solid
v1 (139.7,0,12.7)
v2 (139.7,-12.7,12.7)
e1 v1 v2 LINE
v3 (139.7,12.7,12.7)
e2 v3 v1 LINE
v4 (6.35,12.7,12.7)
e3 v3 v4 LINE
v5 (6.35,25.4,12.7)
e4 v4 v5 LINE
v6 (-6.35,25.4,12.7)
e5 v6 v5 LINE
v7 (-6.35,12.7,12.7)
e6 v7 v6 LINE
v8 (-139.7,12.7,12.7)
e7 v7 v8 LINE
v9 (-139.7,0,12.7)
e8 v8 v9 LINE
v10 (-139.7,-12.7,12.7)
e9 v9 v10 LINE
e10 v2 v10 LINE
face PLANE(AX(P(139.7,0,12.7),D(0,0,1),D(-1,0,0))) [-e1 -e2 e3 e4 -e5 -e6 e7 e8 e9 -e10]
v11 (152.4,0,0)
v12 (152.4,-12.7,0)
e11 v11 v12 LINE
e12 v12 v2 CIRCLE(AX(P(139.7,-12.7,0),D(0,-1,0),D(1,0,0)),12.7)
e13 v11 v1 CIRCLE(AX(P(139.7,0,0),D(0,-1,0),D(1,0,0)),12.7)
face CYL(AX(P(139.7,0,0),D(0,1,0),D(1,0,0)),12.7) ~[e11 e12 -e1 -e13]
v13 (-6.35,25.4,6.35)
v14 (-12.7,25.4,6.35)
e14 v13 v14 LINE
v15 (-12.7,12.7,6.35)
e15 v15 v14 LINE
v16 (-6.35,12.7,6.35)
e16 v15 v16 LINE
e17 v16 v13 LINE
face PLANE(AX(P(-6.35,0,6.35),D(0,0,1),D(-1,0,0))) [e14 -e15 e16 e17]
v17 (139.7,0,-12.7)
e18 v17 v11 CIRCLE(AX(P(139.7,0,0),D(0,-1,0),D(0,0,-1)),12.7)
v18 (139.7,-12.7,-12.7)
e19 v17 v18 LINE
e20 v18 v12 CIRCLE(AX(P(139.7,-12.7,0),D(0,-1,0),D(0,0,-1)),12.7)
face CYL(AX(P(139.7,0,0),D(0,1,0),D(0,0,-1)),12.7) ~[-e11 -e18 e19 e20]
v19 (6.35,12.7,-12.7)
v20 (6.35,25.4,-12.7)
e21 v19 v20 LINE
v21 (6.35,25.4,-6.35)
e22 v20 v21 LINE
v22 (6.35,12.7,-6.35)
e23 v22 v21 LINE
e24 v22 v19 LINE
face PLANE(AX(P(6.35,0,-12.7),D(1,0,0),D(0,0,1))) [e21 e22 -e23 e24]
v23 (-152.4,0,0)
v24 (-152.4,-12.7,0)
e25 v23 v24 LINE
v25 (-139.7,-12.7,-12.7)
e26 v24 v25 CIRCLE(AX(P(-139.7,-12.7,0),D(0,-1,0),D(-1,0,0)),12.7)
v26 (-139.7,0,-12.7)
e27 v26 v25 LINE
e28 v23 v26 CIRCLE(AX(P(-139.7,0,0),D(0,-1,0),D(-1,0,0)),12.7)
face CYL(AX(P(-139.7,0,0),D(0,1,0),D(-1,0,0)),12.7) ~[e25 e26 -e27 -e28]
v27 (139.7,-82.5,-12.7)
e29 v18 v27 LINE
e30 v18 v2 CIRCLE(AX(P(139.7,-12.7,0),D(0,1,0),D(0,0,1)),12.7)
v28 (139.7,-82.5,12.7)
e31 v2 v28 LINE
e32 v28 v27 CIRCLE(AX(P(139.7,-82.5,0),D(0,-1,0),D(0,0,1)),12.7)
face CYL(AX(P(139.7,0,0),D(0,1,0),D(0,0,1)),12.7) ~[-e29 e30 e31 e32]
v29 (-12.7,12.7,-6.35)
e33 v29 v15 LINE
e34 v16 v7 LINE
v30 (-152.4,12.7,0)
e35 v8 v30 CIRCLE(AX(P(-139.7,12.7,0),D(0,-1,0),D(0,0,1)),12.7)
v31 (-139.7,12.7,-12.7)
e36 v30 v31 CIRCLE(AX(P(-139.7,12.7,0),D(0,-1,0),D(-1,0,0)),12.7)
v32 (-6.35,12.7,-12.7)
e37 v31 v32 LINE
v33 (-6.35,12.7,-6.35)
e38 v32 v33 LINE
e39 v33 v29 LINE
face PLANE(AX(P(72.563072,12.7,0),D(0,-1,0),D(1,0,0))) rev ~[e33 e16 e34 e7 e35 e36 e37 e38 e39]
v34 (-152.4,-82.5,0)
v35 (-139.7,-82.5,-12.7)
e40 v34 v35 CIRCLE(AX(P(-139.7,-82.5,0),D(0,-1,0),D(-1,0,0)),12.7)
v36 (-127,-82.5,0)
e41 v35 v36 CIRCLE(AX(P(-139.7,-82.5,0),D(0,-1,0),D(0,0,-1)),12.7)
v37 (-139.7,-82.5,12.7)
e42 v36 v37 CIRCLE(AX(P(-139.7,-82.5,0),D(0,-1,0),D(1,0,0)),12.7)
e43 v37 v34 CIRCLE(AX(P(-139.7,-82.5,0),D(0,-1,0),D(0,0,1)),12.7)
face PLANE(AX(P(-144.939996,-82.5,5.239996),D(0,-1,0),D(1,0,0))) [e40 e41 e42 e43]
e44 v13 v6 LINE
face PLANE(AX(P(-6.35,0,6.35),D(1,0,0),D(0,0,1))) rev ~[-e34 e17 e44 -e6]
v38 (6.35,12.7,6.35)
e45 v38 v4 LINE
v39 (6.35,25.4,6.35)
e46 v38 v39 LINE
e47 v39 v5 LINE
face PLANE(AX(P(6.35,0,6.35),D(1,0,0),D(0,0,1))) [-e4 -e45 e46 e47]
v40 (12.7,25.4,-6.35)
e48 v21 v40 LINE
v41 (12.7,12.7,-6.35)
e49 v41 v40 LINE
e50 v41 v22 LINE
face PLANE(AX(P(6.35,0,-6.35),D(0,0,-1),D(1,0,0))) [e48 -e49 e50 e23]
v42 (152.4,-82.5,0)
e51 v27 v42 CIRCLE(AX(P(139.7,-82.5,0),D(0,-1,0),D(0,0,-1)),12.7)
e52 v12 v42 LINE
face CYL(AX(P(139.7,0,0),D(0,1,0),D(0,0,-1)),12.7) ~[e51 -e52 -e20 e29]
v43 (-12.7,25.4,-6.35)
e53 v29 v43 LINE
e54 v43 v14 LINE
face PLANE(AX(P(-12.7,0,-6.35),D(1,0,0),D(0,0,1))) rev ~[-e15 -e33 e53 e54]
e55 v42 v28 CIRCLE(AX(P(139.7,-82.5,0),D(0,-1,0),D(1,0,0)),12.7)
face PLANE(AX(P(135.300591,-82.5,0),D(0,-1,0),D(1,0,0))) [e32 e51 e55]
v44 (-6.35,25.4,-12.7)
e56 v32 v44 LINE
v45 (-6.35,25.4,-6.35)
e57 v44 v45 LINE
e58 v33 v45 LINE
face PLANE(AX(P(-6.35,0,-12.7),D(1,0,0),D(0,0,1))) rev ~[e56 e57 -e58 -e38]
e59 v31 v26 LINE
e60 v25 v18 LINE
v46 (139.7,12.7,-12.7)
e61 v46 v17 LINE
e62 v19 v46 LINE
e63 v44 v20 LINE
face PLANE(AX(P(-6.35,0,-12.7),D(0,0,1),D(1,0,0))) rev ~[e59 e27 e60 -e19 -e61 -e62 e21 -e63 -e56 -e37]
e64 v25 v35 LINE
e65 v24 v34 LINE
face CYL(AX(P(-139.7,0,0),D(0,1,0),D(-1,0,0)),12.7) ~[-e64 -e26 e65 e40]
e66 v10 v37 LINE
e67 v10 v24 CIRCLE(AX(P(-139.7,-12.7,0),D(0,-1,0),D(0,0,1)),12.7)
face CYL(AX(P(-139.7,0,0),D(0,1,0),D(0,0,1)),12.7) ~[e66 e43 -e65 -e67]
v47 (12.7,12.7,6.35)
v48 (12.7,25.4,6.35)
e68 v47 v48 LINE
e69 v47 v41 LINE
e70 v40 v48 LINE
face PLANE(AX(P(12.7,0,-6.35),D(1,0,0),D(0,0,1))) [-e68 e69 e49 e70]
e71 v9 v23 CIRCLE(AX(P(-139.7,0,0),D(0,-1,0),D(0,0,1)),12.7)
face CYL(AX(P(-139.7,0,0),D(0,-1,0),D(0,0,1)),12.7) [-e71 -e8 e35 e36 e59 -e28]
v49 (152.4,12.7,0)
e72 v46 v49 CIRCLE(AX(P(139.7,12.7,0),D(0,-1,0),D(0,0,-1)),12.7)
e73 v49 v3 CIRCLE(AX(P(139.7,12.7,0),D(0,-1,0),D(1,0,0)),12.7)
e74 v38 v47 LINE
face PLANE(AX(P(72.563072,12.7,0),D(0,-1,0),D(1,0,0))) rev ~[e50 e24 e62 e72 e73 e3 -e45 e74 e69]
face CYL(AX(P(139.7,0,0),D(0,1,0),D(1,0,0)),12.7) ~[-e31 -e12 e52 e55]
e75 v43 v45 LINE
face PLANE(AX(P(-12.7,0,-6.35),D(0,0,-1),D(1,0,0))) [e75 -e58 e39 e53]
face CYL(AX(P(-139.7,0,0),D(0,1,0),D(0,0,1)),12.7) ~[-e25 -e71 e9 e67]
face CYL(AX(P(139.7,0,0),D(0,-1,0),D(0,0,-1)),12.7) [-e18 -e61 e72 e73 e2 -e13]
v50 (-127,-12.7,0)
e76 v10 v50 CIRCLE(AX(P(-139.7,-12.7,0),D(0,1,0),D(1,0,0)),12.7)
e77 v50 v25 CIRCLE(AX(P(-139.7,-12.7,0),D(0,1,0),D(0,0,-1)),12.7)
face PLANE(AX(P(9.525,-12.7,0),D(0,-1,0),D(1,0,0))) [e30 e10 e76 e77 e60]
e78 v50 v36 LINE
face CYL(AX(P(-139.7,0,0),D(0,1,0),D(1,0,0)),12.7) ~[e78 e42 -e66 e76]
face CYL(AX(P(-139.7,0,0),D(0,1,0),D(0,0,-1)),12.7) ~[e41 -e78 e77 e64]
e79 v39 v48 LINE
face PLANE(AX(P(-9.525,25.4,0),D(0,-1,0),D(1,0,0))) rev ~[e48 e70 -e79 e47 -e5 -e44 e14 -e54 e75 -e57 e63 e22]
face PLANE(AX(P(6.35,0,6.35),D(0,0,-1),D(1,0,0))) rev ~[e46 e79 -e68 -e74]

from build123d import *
from build123d import SkipClean  # not in build123d's __all__

# Parameters (mm, degrees)
F1_DEPTH = 82.5
F0_W     = 12.7
F0_H     = 6.35
F2_DEPTH = 12.7
F0_W_2   = 6.35
F0_H_2   = 12.7
F4_DEPTH = 25.4
F5_DEPTH = 12.7


# Not quite as in the source:
# - after a boolean that leaves OpenCascade's solid faulty, fix() repairs it
# - a feature of the source that left no trace in its solid (it failed there, or was rolled back) is left out
# - a feature names something its author has since deleted; it is built from what else it names


with BuildPart() as f1:
    # F0 (on Front) → F1 (new body)
    with BuildSketch(Plane.XZ):
        with BuildLine():
            Line((-139.7, 0), (-139.7, 12.7))
            ThreePointArc((-139.7, 12.7), (-148.6802561211, 8.9802561211), (-152.4, 0))
            Line((-152.4, 0), (-139.7, 0))
        make_face()
        with BuildLine():
            ThreePointArc((-127, 0), (-130.7197438789, 8.9802561211), (-139.7, 12.7))
            Line((-139.7, 12.7), (-139.7, 0))
            Line((-139.7, 0), (-139.7, -12.7))
            ThreePointArc((-139.7, -12.7), (-130.7197438789, -8.9802561211), (-127, 0))
        make_face()
        with BuildLine():
            Line((-139.7, -12.7), (-139.7, 0))
            Line((-139.7, 0), (-152.4, 0))
            ThreePointArc((-152.4, 0), (-148.6802561211, -8.9802561211), (-139.7, -12.7))
        make_face()
        with BuildLine():
            ThreePointArc((-127, 0), (-130.7197438789, 8.9802561211), (-139.7, 12.7))
            Line((-139.7, 12.7), (-139.7, 0))
            Line((-139.7, 0), (-139.7, -12.7))
            ThreePointArc((-139.7, -12.7), (-130.7197438789, -8.9802561211), (-127, 0))
        make_face()
    extrude(amount=F1_DEPTH)



with BuildPart() as f1b:
    # F0 (on Front) → F1, piece 2 (new body)
    with BuildSketch(Plane.XZ):
        with BuildLine():
            Line((139.7, -12.7), (139.7, 12.7))
            ThreePointArc((139.7, 12.7), (127, 0), (139.7, -12.7))
        make_face()
        with BuildLine():
            ThreePointArc((152.4, 0), (148.6802561211, 8.9802561211), (139.7, 12.7))
            Line((139.7, 12.7), (139.7, -12.7))
            ThreePointArc((139.7, -12.7), (148.6802561211, -8.9802561211), (152.4, 0))
        make_face()
        with BuildLine():
            ThreePointArc((152.4, 0), (148.6802561211, 8.9802561211), (139.7, 12.7))
            Line((139.7, 12.7), (139.7, -12.7))
            ThreePointArc((139.7, -12.7), (148.6802561211, -8.9802561211), (152.4, 0))
        make_face()
    extrude(amount=F1_DEPTH)


with BuildPart() as f1_1:
    add(f1.part, clean=False)

    with SkipClean():  # cleaning this boolean's faces spoils the solid; the shape is the same uncleaned
        add(f1b.part)  # F2 merges F1b
    # F0 (on Front) → F2 (join, symmetric)
    with BuildSketch(Plane.XZ):
        with BuildLine():
            Line((139.7, 12.7), (6.35, 12.7))
            Line((6.35, 12.7), (6.35, 6.35))
            Line((6.35, 6.35), (12.7, 6.35))
            Line((12.7, 6.35), (12.7, -6.35))
            Line((12.7, -6.35), (6.35, -6.35))
            Line((6.35, -6.35), (6.35, -12.7))
            Line((6.35, -12.7), (139.7, -12.7))
            ThreePointArc((139.7, -12.7), (127, 0), (139.7, 12.7))
        make_face()
        with BuildLine():
            Line((139.7, -12.7), (139.7, 12.7))
            ThreePointArc((139.7, 12.7), (127, 0), (139.7, -12.7))
        make_face()
        with BuildLine():
            Line((139.7, -12.7), (139.7, 12.7))
            ThreePointArc((139.7, 12.7), (127, 0), (139.7, -12.7))
        make_face()
        with BuildLine():
            ThreePointArc((152.4, 0), (148.6802561211, 8.9802561211), (139.7, 12.7))
            Line((139.7, 12.7), (139.7, -12.7))
            ThreePointArc((139.7, -12.7), (148.6802561211, -8.9802561211), (152.4, 0))
        make_face()
        with BuildLine():
            Line((-139.7, 0), (-139.7, 12.7))
            ThreePointArc((-139.7, 12.7), (-148.6802561211, 8.9802561211), (-152.4, 0))
            Line((-152.4, 0), (-139.7, 0))
        make_face()
        with BuildLine():
            Line((-139.7, -12.7), (-139.7, 0))
            Line((-139.7, 0), (-152.4, 0))
            ThreePointArc((-152.4, 0), (-148.6802561211, -8.9802561211), (-139.7, -12.7))
        make_face()
        with BuildLine():
            ThreePointArc((-127, 0), (-130.7197438789, 8.9802561211), (-139.7, 12.7))
            Line((-139.7, 12.7), (-139.7, 0))
            Line((-139.7, 0), (-139.7, -12.7))
            ThreePointArc((-139.7, -12.7), (-130.7197438789, -8.9802561211), (-127, 0))
        make_face()
        with BuildLine():
            Line((-6.35, 12.7), (-139.7, 12.7))
            ThreePointArc((-139.7, 12.7), (-130.7197438789, 8.9802561211), (-127, 0))
            ThreePointArc((-127, 0), (-130.7197438789, -8.9802561211), (-139.7, -12.7))
            Line((-139.7, -12.7), (-6.35, -12.7))
            Line((-6.35, -12.7), (-6.35, -6.35))
            Line((-6.35, -6.35), (-12.7, -6.35))
            Line((-12.7, -6.35), (-12.7, 6.35))
            Line((-12.7, 6.35), (-6.35, 6.35))
            Line((-6.35, 6.35), (-6.35, 12.7))
        make_face()
        with Locations((0, 9.525)):
            Rectangle(F0_W, F0_H)
    with SkipClean():  # cleaning this boolean's faces spoils the solid; the shape is the same uncleaned
        extrude(amount=F2_DEPTH, both=True)

    # F0 (on Front) → F4 (join)
    with BuildSketch(Plane.XZ):
        with Locations((-9.525, 0)):
            Rectangle(F0_W_2, F0_H_2)
        Rectangle(F0_W, F0_H_2)
        with Locations((0, 9.525)):
            Rectangle(F0_W, F0_H)
        with Locations((9.525, 0)):
            Rectangle(F0_W_2, F0_H_2)
        with Locations((0, -9.525)):
            Rectangle(F0_W, F0_H)
    extrude(amount=-F4_DEPTH)

    add(f1_1.part.fix(), mode=Mode.REPLACE)

    # F0 (on Front) → F5 (join)
    with BuildSketch(Plane.XZ):
        with Locations((9.525, 0)):
            Rectangle(F0_W_2, F0_H_2)
        with Locations((0, -9.525)):
            Rectangle(F0_W, F0_H)
        with Locations((0, 9.525)):
            Rectangle(F0_W, F0_H)
        with Locations((-9.525, 0)):
            Rectangle(F0_W_2, F0_H_2)
        Rectangle(F0_W, F0_H_2)
    extrude(amount=F5_DEPTH)


solid = f1_1.part
